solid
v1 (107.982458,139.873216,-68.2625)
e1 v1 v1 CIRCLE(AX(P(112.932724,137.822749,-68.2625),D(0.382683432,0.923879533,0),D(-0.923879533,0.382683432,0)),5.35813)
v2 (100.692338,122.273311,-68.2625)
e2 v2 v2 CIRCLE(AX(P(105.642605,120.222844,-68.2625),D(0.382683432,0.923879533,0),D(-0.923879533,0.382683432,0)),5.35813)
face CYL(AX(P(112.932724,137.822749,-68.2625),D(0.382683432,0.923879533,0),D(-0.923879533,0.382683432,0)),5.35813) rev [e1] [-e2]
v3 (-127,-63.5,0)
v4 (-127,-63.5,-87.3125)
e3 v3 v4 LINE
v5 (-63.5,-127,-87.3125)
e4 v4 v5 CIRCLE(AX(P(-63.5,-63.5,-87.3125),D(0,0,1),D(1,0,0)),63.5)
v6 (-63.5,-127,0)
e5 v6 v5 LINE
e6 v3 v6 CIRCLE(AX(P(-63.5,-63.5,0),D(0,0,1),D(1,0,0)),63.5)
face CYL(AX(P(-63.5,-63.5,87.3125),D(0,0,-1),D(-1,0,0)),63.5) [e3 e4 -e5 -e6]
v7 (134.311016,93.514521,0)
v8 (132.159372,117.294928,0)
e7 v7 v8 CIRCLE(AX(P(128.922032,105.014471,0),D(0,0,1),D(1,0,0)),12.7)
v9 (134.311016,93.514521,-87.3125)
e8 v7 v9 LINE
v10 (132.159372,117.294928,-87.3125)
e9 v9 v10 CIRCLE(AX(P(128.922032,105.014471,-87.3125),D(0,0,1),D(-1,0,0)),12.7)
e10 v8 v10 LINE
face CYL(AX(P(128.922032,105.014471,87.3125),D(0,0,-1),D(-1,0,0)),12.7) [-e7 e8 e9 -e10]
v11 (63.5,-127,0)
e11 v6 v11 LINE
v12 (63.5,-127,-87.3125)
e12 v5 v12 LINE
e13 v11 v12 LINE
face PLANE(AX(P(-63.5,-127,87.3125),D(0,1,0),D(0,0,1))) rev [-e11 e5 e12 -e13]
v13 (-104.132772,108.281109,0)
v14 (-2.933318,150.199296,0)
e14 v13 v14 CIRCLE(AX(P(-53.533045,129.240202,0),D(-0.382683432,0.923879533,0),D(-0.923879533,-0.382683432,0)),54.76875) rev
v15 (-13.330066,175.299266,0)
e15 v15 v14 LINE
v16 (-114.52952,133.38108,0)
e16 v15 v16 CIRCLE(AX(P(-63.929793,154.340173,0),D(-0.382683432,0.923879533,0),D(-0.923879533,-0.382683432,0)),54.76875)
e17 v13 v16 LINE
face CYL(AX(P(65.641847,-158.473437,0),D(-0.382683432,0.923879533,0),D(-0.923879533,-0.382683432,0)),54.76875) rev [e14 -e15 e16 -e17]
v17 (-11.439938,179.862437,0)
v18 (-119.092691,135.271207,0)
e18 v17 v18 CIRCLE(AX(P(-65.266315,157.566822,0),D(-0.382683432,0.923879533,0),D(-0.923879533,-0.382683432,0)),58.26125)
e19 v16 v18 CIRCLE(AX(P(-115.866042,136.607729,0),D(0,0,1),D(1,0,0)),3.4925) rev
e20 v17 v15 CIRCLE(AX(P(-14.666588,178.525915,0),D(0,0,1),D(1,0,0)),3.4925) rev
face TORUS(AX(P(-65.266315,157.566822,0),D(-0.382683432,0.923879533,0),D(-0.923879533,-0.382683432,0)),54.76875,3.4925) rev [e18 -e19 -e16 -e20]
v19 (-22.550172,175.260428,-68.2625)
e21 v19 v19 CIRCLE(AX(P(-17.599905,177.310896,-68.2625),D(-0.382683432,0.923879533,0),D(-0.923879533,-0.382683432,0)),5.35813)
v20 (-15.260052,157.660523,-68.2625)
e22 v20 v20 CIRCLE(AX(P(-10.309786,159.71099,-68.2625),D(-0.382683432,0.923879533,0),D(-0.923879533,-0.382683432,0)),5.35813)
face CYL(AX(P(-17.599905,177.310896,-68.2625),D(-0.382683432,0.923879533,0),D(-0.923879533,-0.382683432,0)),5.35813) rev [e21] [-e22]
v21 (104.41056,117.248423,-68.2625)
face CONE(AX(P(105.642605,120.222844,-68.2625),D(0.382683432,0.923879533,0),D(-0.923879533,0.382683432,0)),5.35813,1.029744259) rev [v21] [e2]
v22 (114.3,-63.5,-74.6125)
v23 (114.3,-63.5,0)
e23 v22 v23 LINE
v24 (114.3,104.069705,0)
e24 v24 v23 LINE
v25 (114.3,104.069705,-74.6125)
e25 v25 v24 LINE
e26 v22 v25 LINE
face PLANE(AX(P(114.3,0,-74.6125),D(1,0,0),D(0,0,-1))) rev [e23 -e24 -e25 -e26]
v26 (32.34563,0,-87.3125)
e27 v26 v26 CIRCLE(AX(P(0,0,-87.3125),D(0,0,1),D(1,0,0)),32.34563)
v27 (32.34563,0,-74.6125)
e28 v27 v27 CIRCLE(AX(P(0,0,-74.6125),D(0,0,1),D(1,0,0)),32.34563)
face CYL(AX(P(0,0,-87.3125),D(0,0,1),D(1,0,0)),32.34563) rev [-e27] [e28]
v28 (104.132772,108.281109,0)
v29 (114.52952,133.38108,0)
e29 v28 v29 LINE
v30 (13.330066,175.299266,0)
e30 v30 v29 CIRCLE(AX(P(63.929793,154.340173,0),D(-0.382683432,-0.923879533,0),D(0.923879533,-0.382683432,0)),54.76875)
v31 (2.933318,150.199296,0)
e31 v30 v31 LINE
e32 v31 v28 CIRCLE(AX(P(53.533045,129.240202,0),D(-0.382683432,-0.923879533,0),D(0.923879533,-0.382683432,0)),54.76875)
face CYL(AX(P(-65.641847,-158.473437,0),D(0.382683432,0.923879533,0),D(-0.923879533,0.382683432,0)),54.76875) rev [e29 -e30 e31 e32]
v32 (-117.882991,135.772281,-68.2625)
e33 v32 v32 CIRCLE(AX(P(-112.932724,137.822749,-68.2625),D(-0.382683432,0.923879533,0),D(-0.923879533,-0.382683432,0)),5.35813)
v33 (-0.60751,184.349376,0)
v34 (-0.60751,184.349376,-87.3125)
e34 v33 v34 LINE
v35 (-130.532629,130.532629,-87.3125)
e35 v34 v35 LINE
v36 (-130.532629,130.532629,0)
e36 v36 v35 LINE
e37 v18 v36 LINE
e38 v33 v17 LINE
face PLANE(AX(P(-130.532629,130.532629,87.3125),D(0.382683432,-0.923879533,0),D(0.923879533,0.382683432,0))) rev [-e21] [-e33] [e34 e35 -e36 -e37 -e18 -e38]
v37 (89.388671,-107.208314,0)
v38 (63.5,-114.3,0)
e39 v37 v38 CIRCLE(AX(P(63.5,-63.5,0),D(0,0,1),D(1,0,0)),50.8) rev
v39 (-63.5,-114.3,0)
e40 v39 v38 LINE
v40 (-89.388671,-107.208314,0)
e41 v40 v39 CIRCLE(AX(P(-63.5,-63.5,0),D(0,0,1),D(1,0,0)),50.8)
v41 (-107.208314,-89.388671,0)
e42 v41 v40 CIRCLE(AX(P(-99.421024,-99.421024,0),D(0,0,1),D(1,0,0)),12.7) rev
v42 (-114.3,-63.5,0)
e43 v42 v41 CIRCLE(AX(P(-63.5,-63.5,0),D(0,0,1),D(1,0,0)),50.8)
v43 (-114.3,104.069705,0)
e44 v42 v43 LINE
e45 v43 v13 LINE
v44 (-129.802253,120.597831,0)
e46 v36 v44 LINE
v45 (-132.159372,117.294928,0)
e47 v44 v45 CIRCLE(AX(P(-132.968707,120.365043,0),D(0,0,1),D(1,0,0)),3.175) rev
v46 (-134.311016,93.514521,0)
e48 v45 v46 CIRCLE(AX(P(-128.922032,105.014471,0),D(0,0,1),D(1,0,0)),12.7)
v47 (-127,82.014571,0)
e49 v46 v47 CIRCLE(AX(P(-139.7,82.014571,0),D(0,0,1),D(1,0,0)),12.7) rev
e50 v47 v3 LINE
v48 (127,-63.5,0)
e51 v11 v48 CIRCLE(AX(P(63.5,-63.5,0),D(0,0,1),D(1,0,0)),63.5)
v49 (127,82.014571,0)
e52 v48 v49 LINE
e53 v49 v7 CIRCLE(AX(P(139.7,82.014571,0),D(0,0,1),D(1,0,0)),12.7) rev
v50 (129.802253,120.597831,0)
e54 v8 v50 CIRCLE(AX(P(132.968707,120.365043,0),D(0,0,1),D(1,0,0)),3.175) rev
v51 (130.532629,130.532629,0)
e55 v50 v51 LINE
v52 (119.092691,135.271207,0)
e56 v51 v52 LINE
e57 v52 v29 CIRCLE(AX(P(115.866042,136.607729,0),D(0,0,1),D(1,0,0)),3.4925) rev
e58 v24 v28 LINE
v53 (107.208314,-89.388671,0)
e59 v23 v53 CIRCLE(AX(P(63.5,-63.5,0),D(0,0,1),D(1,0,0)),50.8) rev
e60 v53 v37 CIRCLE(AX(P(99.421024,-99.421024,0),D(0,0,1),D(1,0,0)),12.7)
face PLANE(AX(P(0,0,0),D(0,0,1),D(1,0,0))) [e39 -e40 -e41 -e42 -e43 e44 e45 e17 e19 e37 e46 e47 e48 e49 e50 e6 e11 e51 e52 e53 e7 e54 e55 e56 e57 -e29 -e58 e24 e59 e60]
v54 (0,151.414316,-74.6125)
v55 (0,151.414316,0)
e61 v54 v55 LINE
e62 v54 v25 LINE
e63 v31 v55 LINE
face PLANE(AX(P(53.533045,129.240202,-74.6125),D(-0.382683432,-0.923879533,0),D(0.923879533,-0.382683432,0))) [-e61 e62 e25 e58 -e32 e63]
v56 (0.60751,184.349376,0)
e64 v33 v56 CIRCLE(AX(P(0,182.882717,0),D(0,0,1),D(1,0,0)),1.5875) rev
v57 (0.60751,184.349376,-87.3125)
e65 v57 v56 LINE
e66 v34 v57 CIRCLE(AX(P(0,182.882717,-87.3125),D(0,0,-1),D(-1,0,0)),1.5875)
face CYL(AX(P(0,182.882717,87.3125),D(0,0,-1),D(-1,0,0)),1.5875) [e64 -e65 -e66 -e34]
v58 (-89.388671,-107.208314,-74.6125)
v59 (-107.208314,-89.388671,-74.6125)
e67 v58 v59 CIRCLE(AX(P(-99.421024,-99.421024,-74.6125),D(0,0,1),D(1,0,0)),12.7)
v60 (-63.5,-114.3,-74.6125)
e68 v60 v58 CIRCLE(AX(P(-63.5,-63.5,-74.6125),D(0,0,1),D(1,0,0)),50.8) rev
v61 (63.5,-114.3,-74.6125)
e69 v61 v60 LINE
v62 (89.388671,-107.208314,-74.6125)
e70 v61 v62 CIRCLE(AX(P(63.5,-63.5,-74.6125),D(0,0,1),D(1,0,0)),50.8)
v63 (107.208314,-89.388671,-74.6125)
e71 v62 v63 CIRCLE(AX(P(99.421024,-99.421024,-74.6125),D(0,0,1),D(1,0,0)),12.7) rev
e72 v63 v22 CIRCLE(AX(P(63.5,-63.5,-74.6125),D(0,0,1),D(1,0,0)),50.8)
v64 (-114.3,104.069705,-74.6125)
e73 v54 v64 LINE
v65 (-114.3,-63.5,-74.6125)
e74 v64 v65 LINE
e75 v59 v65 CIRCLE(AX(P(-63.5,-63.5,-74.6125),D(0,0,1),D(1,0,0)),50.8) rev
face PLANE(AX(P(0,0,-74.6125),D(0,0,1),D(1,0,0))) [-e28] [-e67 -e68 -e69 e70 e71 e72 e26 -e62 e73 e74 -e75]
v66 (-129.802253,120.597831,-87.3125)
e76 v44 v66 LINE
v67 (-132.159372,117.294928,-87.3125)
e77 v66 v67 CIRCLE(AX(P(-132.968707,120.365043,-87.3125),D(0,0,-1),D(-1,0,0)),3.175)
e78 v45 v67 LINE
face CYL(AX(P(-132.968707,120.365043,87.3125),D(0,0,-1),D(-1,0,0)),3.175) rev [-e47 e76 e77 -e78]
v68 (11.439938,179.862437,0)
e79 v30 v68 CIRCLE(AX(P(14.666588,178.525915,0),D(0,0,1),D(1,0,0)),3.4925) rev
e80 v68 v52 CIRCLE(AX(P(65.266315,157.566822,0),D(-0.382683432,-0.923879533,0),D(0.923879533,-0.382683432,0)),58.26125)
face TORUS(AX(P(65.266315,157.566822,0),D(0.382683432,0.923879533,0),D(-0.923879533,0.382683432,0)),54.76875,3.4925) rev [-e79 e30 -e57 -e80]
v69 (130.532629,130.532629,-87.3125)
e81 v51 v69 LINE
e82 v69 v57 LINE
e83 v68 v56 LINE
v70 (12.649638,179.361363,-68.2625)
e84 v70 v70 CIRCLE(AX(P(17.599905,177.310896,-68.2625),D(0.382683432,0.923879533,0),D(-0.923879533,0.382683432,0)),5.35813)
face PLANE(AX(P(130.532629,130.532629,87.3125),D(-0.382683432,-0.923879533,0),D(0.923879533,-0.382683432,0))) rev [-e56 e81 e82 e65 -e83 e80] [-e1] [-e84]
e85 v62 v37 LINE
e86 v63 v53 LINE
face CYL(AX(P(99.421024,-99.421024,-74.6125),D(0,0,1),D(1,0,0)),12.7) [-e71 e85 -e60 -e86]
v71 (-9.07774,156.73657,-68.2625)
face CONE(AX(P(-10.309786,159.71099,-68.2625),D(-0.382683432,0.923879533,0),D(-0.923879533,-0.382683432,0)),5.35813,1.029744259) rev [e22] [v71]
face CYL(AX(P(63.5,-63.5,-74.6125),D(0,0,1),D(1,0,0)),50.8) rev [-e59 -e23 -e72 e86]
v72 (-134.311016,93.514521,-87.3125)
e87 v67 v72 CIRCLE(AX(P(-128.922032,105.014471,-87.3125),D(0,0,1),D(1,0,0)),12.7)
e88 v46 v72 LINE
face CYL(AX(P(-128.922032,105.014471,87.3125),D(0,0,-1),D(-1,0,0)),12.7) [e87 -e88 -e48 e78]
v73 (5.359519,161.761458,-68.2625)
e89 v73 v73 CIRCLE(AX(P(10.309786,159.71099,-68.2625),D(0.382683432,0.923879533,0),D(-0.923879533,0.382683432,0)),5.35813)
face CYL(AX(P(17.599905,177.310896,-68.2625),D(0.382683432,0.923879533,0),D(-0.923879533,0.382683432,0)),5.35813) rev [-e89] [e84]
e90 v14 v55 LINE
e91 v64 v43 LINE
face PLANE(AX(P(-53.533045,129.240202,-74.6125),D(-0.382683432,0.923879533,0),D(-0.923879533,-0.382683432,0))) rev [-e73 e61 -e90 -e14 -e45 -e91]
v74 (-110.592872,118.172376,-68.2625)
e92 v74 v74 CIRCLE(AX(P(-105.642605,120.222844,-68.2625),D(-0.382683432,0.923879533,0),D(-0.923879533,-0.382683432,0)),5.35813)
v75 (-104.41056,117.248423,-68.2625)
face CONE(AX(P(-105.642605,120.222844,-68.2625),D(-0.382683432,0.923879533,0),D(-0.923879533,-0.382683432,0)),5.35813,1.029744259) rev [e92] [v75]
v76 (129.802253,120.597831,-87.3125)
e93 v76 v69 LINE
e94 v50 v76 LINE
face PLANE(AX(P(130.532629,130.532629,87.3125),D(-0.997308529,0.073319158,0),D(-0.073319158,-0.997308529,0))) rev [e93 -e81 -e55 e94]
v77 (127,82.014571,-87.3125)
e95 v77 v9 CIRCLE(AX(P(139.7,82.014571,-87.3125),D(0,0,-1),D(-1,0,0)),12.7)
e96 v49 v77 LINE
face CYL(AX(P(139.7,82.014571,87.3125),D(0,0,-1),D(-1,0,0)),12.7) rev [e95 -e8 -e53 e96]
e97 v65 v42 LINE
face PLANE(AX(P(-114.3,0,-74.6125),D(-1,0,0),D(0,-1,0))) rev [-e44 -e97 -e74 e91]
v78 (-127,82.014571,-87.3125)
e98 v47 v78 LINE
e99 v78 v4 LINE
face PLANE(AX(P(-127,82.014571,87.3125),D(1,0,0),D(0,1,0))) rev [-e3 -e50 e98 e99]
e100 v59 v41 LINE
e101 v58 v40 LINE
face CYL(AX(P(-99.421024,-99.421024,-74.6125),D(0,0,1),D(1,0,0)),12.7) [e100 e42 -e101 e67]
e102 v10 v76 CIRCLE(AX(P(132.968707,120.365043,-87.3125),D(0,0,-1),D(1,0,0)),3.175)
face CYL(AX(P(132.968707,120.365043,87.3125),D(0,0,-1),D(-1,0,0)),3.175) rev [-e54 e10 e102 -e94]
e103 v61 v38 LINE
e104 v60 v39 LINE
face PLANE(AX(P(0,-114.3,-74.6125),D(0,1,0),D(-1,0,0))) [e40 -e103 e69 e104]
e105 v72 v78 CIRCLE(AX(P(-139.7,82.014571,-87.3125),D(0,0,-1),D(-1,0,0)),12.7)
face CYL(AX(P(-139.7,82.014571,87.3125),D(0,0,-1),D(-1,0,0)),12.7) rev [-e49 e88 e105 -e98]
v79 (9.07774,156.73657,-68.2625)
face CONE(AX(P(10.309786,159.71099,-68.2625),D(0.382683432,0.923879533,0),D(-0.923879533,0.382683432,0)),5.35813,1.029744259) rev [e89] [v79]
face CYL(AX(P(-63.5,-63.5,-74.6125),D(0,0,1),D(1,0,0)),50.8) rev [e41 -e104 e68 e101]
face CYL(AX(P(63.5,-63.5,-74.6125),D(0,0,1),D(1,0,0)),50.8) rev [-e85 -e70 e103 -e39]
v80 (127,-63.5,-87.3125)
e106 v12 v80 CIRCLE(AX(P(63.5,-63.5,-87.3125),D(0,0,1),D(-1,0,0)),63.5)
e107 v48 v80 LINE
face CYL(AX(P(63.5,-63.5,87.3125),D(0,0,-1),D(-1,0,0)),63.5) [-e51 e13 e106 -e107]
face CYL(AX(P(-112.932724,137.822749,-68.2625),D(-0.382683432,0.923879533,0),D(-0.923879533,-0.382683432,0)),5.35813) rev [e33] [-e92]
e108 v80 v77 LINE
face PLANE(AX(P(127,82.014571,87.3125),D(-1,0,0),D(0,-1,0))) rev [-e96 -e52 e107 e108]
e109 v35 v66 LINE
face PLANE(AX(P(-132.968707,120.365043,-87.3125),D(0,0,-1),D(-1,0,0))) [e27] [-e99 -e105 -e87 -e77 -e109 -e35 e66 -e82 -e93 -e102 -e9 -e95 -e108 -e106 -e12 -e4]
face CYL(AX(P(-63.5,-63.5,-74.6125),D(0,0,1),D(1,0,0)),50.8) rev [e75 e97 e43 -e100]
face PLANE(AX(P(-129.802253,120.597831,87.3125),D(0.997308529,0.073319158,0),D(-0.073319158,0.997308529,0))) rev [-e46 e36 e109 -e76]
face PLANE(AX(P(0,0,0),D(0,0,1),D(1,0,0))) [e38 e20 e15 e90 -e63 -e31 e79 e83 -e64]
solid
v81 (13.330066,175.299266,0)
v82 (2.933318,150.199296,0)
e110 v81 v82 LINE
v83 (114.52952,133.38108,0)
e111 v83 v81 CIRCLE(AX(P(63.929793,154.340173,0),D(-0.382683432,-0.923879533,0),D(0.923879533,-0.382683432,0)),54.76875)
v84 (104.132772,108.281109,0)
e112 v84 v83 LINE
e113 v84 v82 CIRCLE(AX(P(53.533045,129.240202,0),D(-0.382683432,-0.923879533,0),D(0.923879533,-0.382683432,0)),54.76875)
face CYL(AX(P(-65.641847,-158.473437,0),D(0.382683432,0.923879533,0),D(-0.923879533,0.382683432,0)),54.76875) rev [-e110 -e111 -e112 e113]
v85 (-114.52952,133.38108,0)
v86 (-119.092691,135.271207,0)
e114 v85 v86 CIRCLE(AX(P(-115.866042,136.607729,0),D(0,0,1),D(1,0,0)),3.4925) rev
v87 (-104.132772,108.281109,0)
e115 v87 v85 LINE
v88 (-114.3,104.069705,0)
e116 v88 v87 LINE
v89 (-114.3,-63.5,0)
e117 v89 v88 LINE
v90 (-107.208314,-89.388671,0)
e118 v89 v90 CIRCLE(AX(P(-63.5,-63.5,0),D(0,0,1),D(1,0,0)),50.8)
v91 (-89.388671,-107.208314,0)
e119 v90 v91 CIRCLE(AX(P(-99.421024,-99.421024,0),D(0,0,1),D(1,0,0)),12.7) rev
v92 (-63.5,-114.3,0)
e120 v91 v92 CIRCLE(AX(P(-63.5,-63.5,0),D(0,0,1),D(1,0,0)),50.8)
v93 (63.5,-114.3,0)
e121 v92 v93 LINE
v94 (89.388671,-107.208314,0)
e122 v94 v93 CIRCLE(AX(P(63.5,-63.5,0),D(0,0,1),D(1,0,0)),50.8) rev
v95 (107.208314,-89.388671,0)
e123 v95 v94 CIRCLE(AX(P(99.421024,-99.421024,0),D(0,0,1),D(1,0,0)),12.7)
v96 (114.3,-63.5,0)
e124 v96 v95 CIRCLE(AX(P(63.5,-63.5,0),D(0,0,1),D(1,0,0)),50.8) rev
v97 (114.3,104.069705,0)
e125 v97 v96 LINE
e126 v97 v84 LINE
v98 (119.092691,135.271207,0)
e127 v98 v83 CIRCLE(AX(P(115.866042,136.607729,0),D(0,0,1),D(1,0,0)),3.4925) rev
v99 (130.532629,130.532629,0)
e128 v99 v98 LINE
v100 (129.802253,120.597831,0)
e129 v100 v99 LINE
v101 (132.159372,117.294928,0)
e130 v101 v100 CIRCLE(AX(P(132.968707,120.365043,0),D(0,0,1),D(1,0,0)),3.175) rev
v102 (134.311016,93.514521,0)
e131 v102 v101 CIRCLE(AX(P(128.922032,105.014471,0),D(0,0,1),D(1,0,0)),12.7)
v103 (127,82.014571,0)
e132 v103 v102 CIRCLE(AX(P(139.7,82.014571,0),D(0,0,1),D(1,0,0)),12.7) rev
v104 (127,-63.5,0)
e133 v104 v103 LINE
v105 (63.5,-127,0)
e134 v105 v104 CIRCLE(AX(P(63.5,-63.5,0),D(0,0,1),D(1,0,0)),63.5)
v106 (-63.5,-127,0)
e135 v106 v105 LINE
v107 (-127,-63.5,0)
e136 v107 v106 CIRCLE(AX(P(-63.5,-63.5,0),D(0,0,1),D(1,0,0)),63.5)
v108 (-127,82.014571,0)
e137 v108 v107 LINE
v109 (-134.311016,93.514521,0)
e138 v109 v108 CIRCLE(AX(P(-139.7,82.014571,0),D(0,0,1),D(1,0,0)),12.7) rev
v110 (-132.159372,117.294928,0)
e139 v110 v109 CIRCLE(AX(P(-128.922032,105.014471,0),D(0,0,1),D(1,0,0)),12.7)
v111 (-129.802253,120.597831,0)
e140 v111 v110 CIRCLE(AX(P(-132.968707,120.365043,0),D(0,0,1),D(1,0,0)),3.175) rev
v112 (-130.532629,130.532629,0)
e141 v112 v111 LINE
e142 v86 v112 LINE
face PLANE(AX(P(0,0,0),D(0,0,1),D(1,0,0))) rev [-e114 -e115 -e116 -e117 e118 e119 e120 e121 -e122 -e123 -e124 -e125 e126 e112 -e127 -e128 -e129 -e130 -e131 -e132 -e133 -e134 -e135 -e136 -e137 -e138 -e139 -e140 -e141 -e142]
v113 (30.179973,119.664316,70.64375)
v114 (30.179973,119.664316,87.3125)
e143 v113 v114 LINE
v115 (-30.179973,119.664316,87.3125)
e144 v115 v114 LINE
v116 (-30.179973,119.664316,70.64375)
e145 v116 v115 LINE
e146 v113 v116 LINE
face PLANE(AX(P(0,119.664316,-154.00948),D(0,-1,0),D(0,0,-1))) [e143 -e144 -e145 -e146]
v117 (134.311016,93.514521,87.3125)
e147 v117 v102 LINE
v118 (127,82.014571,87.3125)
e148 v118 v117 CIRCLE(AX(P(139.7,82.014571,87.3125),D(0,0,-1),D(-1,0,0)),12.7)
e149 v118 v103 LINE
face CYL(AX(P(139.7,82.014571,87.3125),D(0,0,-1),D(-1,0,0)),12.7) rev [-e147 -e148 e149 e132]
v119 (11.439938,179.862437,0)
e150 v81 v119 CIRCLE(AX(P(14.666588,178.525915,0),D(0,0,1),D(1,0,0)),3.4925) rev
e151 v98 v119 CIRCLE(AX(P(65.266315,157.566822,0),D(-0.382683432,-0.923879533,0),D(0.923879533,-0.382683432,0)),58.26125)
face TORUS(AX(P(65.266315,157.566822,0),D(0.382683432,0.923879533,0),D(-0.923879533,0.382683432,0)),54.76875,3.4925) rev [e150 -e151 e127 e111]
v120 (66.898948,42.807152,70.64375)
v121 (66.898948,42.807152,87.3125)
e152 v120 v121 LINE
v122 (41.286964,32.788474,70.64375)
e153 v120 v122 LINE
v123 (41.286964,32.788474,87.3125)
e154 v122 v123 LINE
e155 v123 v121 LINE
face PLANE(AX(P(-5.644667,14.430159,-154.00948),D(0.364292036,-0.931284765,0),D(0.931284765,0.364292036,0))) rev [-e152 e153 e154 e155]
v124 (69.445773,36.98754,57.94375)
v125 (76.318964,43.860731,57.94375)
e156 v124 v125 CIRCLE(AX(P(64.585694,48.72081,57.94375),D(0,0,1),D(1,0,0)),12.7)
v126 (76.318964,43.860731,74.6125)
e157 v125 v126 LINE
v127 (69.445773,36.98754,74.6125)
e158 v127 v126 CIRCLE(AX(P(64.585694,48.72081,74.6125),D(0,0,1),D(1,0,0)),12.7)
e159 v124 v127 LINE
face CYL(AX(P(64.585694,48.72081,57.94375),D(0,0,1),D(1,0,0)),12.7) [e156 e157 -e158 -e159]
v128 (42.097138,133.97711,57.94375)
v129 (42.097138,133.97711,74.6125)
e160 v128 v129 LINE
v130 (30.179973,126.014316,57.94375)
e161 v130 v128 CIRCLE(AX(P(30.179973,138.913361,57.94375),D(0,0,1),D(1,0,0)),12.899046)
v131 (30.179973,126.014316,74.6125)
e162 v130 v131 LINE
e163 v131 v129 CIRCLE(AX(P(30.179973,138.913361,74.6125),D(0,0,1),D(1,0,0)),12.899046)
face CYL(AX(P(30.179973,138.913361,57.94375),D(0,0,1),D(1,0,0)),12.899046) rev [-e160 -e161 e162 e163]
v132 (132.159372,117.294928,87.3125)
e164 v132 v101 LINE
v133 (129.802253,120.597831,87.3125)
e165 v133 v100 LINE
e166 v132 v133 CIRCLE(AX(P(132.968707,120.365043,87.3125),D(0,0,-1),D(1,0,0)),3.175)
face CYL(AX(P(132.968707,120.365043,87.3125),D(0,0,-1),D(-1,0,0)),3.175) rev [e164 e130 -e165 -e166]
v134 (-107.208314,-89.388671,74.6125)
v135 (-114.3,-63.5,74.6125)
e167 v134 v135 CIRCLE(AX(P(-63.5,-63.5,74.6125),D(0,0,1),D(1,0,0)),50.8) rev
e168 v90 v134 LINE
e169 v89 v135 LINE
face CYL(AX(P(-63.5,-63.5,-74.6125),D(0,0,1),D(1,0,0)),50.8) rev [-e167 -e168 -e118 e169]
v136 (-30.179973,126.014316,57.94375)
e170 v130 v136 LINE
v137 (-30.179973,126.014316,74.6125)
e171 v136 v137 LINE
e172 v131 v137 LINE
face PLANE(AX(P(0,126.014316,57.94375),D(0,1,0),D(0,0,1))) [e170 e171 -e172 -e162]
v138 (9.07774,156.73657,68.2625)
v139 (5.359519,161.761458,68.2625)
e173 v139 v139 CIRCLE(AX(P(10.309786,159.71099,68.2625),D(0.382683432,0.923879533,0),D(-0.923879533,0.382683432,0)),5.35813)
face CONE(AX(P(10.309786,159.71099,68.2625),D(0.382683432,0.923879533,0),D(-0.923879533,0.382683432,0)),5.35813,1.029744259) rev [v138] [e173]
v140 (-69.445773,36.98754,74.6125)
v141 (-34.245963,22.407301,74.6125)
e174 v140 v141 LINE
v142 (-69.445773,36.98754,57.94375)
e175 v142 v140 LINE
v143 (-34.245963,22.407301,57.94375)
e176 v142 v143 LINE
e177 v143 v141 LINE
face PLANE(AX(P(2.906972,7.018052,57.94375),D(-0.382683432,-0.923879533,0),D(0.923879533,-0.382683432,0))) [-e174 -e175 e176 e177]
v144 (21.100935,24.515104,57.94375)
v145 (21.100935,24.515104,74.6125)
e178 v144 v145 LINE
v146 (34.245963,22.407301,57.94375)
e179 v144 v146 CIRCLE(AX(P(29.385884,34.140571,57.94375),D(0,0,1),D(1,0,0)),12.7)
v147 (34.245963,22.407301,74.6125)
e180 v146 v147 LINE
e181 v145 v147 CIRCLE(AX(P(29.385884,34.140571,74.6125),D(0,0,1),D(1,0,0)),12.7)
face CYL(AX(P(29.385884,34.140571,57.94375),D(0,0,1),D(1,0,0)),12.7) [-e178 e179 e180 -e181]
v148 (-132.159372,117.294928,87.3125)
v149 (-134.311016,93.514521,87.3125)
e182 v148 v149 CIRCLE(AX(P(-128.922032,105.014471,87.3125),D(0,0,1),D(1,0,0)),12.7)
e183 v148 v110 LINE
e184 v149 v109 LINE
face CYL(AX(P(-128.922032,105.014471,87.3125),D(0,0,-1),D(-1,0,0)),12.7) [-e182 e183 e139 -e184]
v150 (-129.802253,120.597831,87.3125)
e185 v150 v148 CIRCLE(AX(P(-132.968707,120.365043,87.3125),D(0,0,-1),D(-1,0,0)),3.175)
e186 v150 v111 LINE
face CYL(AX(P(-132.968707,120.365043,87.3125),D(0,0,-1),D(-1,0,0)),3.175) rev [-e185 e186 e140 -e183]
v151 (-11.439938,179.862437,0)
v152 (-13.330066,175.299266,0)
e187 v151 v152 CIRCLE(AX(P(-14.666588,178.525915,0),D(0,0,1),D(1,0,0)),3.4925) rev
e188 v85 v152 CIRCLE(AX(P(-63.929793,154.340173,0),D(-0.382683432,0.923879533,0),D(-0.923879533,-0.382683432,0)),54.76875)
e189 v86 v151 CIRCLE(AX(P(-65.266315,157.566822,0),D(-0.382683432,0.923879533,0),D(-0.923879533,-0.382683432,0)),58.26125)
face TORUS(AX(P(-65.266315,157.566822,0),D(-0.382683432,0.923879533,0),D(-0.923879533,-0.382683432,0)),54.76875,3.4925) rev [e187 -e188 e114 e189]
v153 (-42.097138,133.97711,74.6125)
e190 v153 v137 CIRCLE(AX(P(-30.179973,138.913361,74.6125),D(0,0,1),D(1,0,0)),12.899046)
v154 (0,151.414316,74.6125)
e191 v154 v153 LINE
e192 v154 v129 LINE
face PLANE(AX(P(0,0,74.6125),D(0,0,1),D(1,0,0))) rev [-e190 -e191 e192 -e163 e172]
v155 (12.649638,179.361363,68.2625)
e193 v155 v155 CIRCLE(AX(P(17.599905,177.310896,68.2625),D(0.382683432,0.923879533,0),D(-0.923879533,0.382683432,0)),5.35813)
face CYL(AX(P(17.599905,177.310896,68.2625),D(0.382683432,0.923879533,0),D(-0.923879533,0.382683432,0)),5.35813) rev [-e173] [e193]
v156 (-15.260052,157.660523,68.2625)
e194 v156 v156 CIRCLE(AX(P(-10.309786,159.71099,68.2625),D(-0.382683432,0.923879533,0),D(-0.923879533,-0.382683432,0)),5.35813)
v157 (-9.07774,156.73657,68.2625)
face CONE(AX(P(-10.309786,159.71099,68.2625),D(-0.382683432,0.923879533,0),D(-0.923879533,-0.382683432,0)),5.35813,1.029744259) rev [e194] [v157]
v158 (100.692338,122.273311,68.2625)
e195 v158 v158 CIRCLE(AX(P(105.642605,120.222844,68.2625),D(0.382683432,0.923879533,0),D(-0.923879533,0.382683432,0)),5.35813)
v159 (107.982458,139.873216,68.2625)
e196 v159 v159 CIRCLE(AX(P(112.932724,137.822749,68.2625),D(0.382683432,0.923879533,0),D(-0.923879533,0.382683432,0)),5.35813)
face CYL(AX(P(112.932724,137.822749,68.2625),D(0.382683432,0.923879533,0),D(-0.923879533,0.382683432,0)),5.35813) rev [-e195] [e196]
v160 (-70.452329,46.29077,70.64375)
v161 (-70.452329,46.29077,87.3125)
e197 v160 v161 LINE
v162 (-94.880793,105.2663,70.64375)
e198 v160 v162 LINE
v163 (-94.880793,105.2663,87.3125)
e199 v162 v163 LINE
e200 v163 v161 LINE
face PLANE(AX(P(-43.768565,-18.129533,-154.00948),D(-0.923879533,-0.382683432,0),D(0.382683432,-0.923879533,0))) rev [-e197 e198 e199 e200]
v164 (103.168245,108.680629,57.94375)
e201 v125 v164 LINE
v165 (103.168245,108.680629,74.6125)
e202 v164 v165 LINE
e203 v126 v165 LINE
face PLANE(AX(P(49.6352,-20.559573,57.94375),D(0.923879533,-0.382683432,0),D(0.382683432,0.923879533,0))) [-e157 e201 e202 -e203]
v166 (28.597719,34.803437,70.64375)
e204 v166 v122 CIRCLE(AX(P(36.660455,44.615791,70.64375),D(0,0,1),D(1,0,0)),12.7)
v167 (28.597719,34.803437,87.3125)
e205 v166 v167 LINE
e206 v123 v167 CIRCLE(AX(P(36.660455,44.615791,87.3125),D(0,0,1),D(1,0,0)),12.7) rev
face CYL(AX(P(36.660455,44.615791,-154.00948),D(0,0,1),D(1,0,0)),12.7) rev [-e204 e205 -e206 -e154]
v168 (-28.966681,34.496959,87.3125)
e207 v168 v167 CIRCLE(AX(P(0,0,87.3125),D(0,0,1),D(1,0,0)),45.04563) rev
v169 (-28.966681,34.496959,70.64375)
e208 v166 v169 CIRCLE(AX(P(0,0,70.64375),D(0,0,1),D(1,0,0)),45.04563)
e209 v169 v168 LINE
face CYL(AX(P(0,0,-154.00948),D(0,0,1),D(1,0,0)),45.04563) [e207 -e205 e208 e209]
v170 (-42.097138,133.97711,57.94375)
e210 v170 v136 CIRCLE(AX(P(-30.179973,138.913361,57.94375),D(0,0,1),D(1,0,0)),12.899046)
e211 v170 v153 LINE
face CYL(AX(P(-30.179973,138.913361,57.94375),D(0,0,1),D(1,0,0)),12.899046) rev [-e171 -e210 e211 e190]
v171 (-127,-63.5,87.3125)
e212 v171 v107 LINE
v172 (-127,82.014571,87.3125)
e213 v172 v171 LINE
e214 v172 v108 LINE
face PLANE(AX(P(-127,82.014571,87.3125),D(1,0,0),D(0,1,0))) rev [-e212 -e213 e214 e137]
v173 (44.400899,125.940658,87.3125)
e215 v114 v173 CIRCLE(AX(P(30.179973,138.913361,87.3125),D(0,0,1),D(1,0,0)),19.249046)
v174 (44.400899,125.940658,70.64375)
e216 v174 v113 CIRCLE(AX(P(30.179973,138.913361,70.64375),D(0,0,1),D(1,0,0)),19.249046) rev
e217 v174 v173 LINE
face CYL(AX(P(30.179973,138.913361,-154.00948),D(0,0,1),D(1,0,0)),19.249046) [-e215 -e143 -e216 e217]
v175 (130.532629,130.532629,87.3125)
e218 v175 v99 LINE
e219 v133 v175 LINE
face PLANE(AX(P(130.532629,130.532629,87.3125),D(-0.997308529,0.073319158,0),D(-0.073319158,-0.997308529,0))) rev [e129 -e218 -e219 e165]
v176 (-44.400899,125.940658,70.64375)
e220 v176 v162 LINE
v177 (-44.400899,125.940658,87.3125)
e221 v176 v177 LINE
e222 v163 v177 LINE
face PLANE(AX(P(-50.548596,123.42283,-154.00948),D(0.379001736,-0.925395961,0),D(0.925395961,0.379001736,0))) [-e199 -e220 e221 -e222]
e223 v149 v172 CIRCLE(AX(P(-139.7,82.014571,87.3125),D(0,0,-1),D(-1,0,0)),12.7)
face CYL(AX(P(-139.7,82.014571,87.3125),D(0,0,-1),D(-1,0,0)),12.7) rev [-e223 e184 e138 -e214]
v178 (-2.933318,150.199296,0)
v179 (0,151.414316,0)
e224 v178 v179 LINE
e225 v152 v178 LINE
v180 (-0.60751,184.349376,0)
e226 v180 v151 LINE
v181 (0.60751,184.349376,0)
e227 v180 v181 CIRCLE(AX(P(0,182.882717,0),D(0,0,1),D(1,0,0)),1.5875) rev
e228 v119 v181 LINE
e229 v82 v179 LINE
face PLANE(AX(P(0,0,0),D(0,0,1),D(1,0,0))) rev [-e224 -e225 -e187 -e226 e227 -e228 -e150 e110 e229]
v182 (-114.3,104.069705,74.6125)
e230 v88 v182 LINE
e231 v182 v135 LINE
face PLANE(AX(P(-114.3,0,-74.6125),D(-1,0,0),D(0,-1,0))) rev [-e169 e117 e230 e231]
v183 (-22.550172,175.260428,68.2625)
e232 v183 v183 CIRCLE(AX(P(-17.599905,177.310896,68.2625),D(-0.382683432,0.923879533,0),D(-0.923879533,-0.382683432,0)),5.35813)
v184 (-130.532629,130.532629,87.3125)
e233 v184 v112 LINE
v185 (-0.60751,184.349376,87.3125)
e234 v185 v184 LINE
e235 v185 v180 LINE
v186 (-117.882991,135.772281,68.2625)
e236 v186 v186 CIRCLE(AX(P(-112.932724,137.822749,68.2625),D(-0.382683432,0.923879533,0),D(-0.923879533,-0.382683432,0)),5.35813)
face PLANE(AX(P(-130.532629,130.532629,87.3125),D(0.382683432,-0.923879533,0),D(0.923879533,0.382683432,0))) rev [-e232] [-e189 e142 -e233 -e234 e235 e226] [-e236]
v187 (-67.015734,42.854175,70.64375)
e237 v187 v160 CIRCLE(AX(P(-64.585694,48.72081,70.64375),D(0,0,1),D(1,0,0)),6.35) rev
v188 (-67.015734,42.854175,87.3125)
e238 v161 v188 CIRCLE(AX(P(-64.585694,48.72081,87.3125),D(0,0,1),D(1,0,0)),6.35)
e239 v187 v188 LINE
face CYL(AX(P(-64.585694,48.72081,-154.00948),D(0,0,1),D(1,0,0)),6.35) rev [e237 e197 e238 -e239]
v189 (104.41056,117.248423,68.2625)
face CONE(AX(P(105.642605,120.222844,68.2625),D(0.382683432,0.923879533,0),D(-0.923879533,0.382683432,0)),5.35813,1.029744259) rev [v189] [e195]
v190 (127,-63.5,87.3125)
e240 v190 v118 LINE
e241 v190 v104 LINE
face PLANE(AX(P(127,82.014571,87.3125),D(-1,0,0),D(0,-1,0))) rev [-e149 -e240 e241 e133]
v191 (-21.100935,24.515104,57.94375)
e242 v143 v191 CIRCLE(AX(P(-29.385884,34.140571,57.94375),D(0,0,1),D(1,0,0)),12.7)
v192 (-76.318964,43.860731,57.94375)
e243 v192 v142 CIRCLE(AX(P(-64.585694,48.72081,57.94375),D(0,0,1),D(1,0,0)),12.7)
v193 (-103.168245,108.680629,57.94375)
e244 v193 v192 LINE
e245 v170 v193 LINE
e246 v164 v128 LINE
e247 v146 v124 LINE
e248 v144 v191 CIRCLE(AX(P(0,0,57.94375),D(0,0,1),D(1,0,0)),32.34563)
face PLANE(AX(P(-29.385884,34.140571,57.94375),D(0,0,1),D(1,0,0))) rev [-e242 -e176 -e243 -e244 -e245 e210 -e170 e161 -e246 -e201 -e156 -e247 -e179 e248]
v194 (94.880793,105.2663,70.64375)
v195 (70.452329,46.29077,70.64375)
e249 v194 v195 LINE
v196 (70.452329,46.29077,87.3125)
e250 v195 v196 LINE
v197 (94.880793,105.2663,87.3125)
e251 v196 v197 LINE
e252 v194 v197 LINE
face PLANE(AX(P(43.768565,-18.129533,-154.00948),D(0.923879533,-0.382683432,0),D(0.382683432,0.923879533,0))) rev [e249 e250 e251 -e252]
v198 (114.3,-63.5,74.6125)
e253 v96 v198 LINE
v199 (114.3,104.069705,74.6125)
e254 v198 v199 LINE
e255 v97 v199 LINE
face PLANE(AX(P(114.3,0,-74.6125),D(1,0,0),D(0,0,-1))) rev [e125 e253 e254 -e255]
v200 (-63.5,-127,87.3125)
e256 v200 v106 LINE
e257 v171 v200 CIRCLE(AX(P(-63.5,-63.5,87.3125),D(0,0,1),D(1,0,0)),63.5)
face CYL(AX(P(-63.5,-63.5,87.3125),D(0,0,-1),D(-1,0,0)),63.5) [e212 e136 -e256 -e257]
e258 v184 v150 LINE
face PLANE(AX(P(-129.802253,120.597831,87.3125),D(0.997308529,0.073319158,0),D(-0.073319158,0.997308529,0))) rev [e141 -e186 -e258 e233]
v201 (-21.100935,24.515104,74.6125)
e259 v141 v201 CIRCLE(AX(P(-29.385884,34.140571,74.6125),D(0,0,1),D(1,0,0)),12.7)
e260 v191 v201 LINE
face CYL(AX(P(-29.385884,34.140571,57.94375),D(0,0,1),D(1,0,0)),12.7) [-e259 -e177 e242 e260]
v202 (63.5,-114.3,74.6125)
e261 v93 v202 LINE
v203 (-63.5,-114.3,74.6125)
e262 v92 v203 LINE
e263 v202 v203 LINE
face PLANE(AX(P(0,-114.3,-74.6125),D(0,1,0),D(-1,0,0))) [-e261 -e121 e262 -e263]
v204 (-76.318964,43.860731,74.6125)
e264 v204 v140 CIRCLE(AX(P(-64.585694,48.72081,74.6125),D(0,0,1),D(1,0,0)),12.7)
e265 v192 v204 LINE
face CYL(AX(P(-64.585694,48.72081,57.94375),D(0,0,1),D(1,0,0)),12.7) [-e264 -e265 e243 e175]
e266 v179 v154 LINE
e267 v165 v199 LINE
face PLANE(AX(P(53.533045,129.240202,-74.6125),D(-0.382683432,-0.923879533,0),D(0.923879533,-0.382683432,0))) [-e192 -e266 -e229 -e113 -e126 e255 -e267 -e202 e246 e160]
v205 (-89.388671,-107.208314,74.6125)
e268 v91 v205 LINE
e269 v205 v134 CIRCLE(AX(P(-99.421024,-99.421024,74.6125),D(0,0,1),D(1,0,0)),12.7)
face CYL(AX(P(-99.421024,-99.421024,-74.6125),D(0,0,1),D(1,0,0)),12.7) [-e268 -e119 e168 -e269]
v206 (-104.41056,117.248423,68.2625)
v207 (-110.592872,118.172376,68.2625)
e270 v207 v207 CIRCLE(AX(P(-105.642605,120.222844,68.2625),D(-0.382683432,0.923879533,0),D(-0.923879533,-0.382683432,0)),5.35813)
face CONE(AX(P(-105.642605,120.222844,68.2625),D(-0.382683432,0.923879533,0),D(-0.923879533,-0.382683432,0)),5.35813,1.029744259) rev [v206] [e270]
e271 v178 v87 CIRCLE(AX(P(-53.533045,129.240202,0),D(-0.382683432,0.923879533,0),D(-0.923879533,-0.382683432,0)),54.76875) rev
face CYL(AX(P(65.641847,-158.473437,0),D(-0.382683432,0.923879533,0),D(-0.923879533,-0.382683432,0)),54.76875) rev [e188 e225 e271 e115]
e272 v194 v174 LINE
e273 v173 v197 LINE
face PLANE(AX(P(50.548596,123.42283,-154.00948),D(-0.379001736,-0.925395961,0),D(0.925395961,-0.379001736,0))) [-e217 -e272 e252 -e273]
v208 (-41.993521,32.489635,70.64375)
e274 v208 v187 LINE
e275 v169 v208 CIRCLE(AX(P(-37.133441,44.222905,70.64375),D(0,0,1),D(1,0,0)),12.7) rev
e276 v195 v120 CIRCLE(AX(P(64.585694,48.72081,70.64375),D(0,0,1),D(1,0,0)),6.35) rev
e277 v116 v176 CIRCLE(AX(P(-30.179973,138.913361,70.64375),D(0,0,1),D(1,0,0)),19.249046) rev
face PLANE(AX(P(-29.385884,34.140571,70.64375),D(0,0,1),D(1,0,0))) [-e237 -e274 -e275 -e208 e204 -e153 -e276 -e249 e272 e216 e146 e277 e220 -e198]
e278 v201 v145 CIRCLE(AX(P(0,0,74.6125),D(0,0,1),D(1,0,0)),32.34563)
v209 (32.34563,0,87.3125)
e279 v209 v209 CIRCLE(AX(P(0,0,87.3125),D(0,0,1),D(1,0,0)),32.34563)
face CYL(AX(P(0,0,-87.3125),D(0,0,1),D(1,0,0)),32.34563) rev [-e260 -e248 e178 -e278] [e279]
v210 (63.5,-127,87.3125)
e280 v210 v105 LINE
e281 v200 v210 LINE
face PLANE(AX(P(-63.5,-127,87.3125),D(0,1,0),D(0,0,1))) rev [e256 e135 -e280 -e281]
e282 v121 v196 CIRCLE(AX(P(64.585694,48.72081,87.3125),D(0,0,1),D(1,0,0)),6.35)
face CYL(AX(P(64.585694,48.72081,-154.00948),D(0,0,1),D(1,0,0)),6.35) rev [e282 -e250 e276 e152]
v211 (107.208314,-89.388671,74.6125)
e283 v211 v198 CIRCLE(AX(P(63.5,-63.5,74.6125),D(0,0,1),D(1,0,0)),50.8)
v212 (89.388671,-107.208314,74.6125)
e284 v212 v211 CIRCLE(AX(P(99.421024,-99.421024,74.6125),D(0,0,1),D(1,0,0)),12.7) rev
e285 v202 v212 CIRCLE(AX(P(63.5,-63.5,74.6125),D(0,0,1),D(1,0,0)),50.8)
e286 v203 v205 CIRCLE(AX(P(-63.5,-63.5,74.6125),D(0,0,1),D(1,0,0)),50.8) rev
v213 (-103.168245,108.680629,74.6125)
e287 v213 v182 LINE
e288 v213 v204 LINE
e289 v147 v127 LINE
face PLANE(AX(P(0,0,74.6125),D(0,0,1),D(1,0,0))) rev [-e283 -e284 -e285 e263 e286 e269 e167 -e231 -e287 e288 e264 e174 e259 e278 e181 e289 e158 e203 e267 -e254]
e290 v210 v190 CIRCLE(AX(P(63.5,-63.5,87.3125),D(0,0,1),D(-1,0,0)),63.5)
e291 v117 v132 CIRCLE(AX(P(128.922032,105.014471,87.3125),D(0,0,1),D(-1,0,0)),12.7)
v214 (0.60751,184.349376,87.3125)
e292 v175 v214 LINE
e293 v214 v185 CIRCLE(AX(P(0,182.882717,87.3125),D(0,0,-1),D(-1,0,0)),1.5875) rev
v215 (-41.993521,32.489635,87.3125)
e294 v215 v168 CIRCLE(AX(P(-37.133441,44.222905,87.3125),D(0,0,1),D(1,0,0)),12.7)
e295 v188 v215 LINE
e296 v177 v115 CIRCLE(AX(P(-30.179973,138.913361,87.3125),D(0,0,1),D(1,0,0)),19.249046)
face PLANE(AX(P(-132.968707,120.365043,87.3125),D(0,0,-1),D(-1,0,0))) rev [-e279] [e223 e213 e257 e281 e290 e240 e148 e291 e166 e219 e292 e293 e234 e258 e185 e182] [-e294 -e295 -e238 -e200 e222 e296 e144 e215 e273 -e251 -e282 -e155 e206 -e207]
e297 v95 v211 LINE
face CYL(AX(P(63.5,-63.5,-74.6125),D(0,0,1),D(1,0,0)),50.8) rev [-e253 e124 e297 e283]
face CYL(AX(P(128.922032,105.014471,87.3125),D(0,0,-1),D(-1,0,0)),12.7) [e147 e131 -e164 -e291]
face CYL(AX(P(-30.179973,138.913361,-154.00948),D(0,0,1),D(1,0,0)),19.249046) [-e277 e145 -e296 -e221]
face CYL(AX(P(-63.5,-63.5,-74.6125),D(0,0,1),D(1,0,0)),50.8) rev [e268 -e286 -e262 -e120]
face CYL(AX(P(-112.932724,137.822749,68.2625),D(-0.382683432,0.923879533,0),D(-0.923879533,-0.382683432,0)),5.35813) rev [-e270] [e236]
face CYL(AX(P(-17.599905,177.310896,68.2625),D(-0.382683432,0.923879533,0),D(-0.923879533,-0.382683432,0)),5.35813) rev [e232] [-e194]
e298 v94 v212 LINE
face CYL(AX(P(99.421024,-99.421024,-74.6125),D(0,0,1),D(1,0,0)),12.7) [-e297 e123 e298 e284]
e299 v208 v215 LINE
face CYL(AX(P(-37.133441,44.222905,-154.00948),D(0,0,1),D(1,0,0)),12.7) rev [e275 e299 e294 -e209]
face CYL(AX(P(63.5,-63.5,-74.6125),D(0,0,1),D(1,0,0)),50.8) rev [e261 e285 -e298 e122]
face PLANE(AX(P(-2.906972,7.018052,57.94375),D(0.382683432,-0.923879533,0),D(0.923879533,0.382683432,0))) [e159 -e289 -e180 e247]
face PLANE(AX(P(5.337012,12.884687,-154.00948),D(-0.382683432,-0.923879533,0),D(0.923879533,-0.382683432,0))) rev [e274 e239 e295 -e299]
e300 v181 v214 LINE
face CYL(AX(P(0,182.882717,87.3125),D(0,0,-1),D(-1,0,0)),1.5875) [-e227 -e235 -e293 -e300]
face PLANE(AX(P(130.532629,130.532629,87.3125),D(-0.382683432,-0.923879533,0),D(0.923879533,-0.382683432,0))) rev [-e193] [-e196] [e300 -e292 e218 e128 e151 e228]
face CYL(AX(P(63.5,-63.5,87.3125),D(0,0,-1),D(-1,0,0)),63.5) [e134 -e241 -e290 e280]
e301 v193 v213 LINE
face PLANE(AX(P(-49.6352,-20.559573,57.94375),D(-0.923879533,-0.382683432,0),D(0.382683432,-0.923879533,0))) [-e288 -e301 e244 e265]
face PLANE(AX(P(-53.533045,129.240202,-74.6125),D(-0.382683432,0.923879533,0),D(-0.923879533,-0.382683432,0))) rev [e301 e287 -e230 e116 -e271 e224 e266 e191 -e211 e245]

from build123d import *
from build123d.topology import SkipClean

# Parameters (mm, degrees)
BOSS_EXTRUDE1_DEPTH                  = 87.3125
CUT_EXTRUDE1_DEPTH                   = 74.6125
CUT_EXTRUDE2_REACH                   = 364.498
SKETCH4_R                            = 54.76875
SKETCH5_R                            = 32.34563
CUT_EXTRUDE3_DEPTH                   = 291.909307414
BOSS_EXTRUDE2_START                  = -12.7
BOSS_EXTRUDE2_DEPTH                  = 16.66875
CUT_EXTRUDE5_DEPTH                   = 16.66875
TAP_DRILL_FOR_1_2_13_TAP2_AT_2_COUNT = 2
TAP_DRILL_FOR_1_2_13_TAP2_AT_2_PITCH = 103.1875
TAP_DRILL_FOR_1_2_13_TAP2_AT_3_COUNT = 2
TAP_DRILL_FOR_1_2_13_TAP2_AT_3_PITCH = 171.133678104
TAP_DRILL_FOR_1_2_13_TAP2_AT_4_COUNT = 2
TAP_DRILL_FOR_1_2_13_TAP2_AT_4_PITCH = 136.525
SKETCH12_R                           = 58.26125
SKETCH12_R_2                         = 54.76875
CUT_EXTRUDE6_DEPTH                   = 3.4925
FILLET3_R                            = 1.5875
FILLET4_R                            = 3.4925
FILLET4_OF_MIRROR2_R                 = 3.4925


with BuildPart() as part:
    # Sketch1 → Boss-Extrude1 (new, symmetric)
    with BuildSketch(Plane.XY):
        with BuildLine():
            Line((-63.5, -127), (63.5, -127))
            ThreePointArc((63.5, -127), (108.401280605, -108.401280605), (127, -63.5))
            Line((127, -63.5), (127, 82.014571468))
            ThreePointArc((127, 82.014571468), (128.982488633, 88.828157168), (134.311015762, 93.51452142))
            ThreePointArc((134.311015762, 93.51452142), (141.570363806, 106.158888477), (132.159372053, 117.29492846))
            ThreePointArc((132.159372053, 117.29492846), (130.384327695, 118.520697957), (129.802252607, 120.597831059))
            Line((129.802252607, 120.597831059), (130.53262945, 130.53262945))
            Line((130.53262945, 130.53262945), (0, 184.6010149))
            Line((0, 184.6010149), (-130.53262945, 130.53262945))
            Line((-130.53262945, 130.53262945), (-129.802252607, 120.597831059))
            ThreePointArc((-129.802252607, 120.597831059), (-130.384327695, 118.520697957), (-132.159372053, 117.29492846))
            ThreePointArc((-132.159372053, 117.29492846), (-141.570363806, 106.158888477), (-134.311015762, 93.51452142))
            ThreePointArc((-134.311015762, 93.51452142), (-128.982488633, 88.828157168), (-127, 82.014571468))
            Line((-127, 82.014571468), (-127, -63.5))
            ThreePointArc((-127, -63.5), (-108.401280605, -108.401280605), (-63.5, -127))
        make_face()
    extrude(amount=BOSS_EXTRUDE1_DEPTH, both=True)

    # Sketch3 → Cut-Extrude1 (cut, symmetric)
    with BuildSketch(Plane.XY):
        with BuildLine():
            Line((-63.5, -114.3), (63.5, -114.3))
            ThreePointArc((63.5, -114.3), (76.921207893, -112.495011773), (89.388670817, -107.208314121))
            ThreePointArc((89.388670817, -107.208314121), (90.440768363, -90.440768363), (107.208314121, -89.388670817))
            ThreePointArc((107.208314121, -89.388670817), (112.495011773, -76.921207893), (114.3, -63.5))
            Line((114.3, -63.5), (114.3, 104.069705413))
            Line((114.3, 104.069705413), (0, 151.414315592))
            Line((0, 151.414315592), (-114.3, 104.069705413))
            Line((-114.3, 104.069705413), (-114.3, -63.5))
            ThreePointArc((-114.3, -63.5), (-112.495011773, -76.921207893), (-107.208314121, -89.388670817))
            ThreePointArc((-107.208314121, -89.388670817), (-90.440768363, -90.440768363), (-89.388670817, -107.208314121))
            ThreePointArc((-89.388670817, -107.208314121), (-76.921207893, -112.495011773), (-63.5, -114.3))
        make_face()
    extrude(amount=CUT_EXTRUDE1_DEPTH, both=True, mode=Mode.SUBTRACT)

    # Sketch4 → Cut-Extrude2 (cut, up to next)
    with BuildSketch(Plane(origin=(-65.266314725, 157.566822175, 0), x_dir=(0.9238795325112863, 0.3826834323650909, 0), z_dir=(-0.3826834323650909, 0.9238795325112863, 0)), mode=Mode.PRIVATE) as cut_extrude2_sk1:
        with Locations(Location((0, 0, 0), (0, 0, 180))):
            Circle(SKETCH4_R)
    cut_extrude2_tool1 = extrude(cut_extrude2_sk1.sketch, amount=-CUT_EXTRUDE2_REACH, mode=Mode.PRIVATE) & part.part
    cut_extrude2 = cut_extrude2_tool1.solids().sort_by_distance((-65.266315, 157.566822, 0))[0]
    add(cut_extrude2, mode=Mode.SUBTRACT)

    # Sketch5 → Cut-Extrude3 (cut, through all)
    with BuildSketch(Plane.XY.offset(87.3125)):
        Circle(SKETCH5_R)
    extrude(amount=-CUT_EXTRUDE3_DEPTH, mode=Mode.SUBTRACT)

    # Sketch6 → Boss-Extrude2 (add)
    with SkipClean():  # the faces are left unmerged after this step: merging them gives an invalid solid
        with BuildSketch(Plane.XY.offset(87.3125).offset(BOSS_EXTRUDE2_START)):
            with BuildLine():
                Line((-103.168245091, 108.680629269), (-76.318963971, 43.86073065))
                ThreePointArc((-76.318963971, 43.86073065), (-73.565950029, 39.74055412), (-69.445773499, 36.987540178))
                Line((-69.445773499, 36.987540178), (-34.24596331, 22.407301405))
                ThreePointArc((-34.24596331, 22.407301405), (-27.375127797, 21.600760439), (-21.100935252, 24.515103744))
                ThreePointArc((-21.100935252, 24.515103744), (0, 32.34563), (21.100935252, 24.515103744))
                ThreePointArc((21.100935252, 24.515103744), (27.375127797, 21.600760439), (34.24596331, 22.407301405))
                Line((34.24596331, 22.407301405), (69.445773499, 36.987540178))
                ThreePointArc((69.445773499, 36.987540178), (73.565950029, 39.74055412), (76.318963971, 43.86073065))
                Line((76.318963971, 43.86073065), (103.168245091, 108.680629269))
                Line((103.168245091, 108.680629269), (42.097137505, 133.977110301))
                ThreePointArc((42.097137505, 133.977110301), (37.346298964, 128.18819679), (30.179973057, 126.014315592))
                Line((30.179973057, 126.014315592), (-30.179973057, 126.014315592))
                ThreePointArc((-30.179973057, 126.014315592), (-37.346298964, 128.18819679), (-42.097137505, 133.977110301))
                Line((-42.097137505, 133.977110301), (-103.168245091, 108.680629269))
            make_face()
        extrude(amount=-BOSS_EXTRUDE2_DEPTH)

    # Sketch7 → Cut-Extrude5 (cut)
    with SkipClean():  # the faces are left unmerged after this step: merging them gives an invalid solid
        with BuildSketch(Plane.XY.offset(87.3125)):
            with BuildLine():
                Line((41.286964233, 32.788474366), (66.898948335, 42.807151986))
                ThreePointArc((66.898948335, 42.807151986), (69.031090097, 44.186391566), (70.45232894, 46.290770445))
                Line((70.45232894, 46.290770445), (94.880793186, 105.266300136))
                Line((94.880793186, 105.266300136), (44.400899101, 125.940658233))
                ThreePointArc((44.400899101, 125.940658233), (37.952154451, 121.303166596), (30.179973057, 119.664315592))
                Line((30.179973057, 119.664315592), (-30.179973057, 119.664315592))
                ThreePointArc((-30.179973057, 119.664315592), (-37.952154451, 121.303166596), (-44.400899101, 125.940658233))
                Line((-44.400899101, 125.940658233), (-94.880793186, 105.266300136))
                Line((-94.880793186, 105.266300136), (-70.45232894, 46.290770445))
                ThreePointArc((-70.45232894, 46.290770445), (-69.075821969, 44.23068218), (-67.015733704, 42.854175209))
                Line((-67.015733704, 42.854175209), (-41.993520552, 32.489635161))
                ThreePointArc((-41.993520552, 32.489635161), (-35.199307828, 31.671047632), (-28.966680979, 34.496958926))
                ThreePointArc((-28.966680979, 34.496958926), (-0.239823776, 45.044991582), (28.597719146, 34.803437212))
                ThreePointArc((28.597719146, 34.803437212), (34.668739167, 32.072941657), (41.286964233, 32.788474366))
            make_face()
        extrude(amount=-CUT_EXTRUDE5_DEPTH, mode=Mode.SUBTRACT)

    # Sketch11 → Tap Drill for 1/2-13 Tap2 (revolve, cut)
    with SkipClean():  # the faces are left unmerged after this step: merging them gives an invalid solid
        with BuildSketch(Plane(origin=(-112.932724355, 137.822748836, -68.2625), x_dir=(-0.9238795325112863, -0.38268343236509084, 0), z_dir=(0, 0, 1))):
            Polygon((0, 0), (0, 22.269489309), (5.35813, 19.05), (5.35813, 0), align=None)
        tap_drill_for_1_2_13_tap2 = revolve(axis=Axis((-115.362764151, 143.689383868, -68.2625), (0.3826834323650909, -0.9238795325112864, 0)), mode=Mode.SUBTRACT)

    # Tap Drill for 1/2-13 Tap2 at 2: Tap Drill for 1/2-13 Tap2 ×2
    with SkipClean():  # the faces are left unmerged after this step: merging them gives an invalid solid
        with Locations(*[Vector(0.9238795325112863, 0.38268343236509084, 0) * (i * TAP_DRILL_FOR_1_2_13_TAP2_AT_2_PITCH) for i in range(1, TAP_DRILL_FOR_1_2_13_TAP2_AT_2_COUNT)]):
            add(tap_drill_for_1_2_13_tap2, mode=Mode.SUBTRACT)

    # Tap Drill for 1/2-13 Tap2 at 3: Tap Drill for 1/2-13 Tap2 ×2
    with SkipClean():  # the faces are left unmerged after this step: merging them gives an invalid solid
        with Locations(*[Vector(0.5570663841124427, 0.23074445144151456, 0.7977681629526483) * (i * TAP_DRILL_FOR_1_2_13_TAP2_AT_3_PITCH) for i in range(1, TAP_DRILL_FOR_1_2_13_TAP2_AT_3_COUNT)]):
            add(tap_drill_for_1_2_13_tap2, mode=Mode.SUBTRACT)

    # Tap Drill for 1/2-13 Tap2 at 4: Tap Drill for 1/2-13 Tap2 ×2
    with SkipClean():  # the faces are left unmerged after this step: merging them gives an invalid solid
        with Locations(*[(0, 0, i * TAP_DRILL_FOR_1_2_13_TAP2_AT_4_PITCH) for i in range(1, TAP_DRILL_FOR_1_2_13_TAP2_AT_4_COUNT)]):
            add(tap_drill_for_1_2_13_tap2, mode=Mode.SUBTRACT)

    # Sketch12 → Cut-Extrude6 (cut)
    with SkipClean():  # the faces are left unmerged after this step: merging them gives an invalid solid
        with BuildSketch(Plane(origin=(-65.266314725, 157.566822175, 0), x_dir=(0.9238795325112854, 0.38268343236509295, 0), z_dir=(-0.38268343236509295, 0.9238795325112854, 0))):
            with Locations(Location((0, 0, 0), (0, 0, 180))):
                Circle(SKETCH12_R)
            with Locations(Location((0, 0, 0), (0, 0, 180))):
                Circle(SKETCH12_R_2, mode=Mode.SUBTRACT)
        cut_extrude6 = extrude(amount=-CUT_EXTRUDE6_DEPTH, mode=Mode.SUBTRACT)

    # Fillet3
    fillet3_edges = [part.edges().sort_by_distance(p)[0] for p in [
        (0, 184.6010149, 0),
    ]]
    fillet(fillet3_edges, radius=FILLET3_R)

    # Fillet4
    fillet4_edges = [part.edges().sort_by_distance(p)[0] for p in [
        (-10.103416424, 176.635788031, 0),
    ]]
    fillet(fillet4_edges, radius=FILLET4_R - 0.0001)  # a hair under: the kernel refuses the full size

    # Mirror2: Cut-Extrude2, Tap Drill for 1/2-13 Tap2, Cut-Extrude6 across plane
    add(cut_extrude2.mirror(Plane(origin=(0, 0, 0), x_dir=(0, 0, 1), z_dir=(1, 0, 0))), mode=Mode.SUBTRACT)
    add(tap_drill_for_1_2_13_tap2.mirror(Plane(origin=(0, 0, 0), x_dir=(0, 0, 1), z_dir=(1, 0, 0))), mode=Mode.SUBTRACT)
    add(cut_extrude6.mirror(Plane(origin=(0, 0, 0), x_dir=(0, 0, 1), z_dir=(1, 0, 0))), mode=Mode.SUBTRACT)

    # Mirror2 copy 1 sketch → Mirror2 copy 1 (revolve, cut)
    with BuildSketch(Plane(origin=(17.599905094, 177.310895513, -68.2625), x_dir=(0.9238795325112863, -0.38268343236509084, 0), z_dir=(0, 0, 1))):
        Polygon((0, 0), (0, -22.269489309), (5.35813, -19.05), (5.35813, 0), align=None)
    revolve(axis=Axis((20.02994489, 183.177530545, -68.2625), (0.3826834323650909, 0.9238795325112864, 0)), mode=Mode.SUBTRACT)

    # Mirror2 copy 2 sketch → Mirror2 copy 2 (revolve, cut)
    with BuildSketch(Plane(origin=(17.599905094, 177.310895513, 68.2625), x_dir=(0.9238795325112863, -0.38268343236509084, 0), z_dir=(0, 0, 1))):
        Polygon((0, 0), (0, -22.269489309), (5.35813, -19.05), (5.35813, 0), align=None)
    revolve(axis=Axis((20.02994489, 183.177530545, 68.2625), (0.3826834323650909, 0.9238795325112864, 0)), mode=Mode.SUBTRACT)

    # Mirror2 copy 3 sketch → Mirror2 copy 3 (revolve, cut)
    with BuildSketch(Plane(origin=(112.932724355, 137.822748836, 68.2625), x_dir=(0.9238795325112863, -0.38268343236509084, 0), z_dir=(0, 0, 1))):
        Polygon((0, 0), (0, -22.269489309), (5.35813, -19.05), (5.35813, 0), align=None)
    revolve(axis=Axis((115.362764151, 143.689383868, 68.2625), (0.3826834323650909, 0.9238795325112864, 0)), mode=Mode.SUBTRACT)

    # Fillet4 of Mirror2
    fillet4_of_mirror2_edges = [part.edges().sort_by_distance(p)[0] for p in [
        (10.103416424, 176.635788031, 0),
    ]]
    fillet(fillet4_of_mirror2_edges, radius=FILLET4_OF_MIRROR2_R - 0.0001)  # a hair under: the kernel refuses the full size


with BuildPart() as body_2:
    # Split1: the piece on the far side of the plane
    add(part.part)
    split(bisect_by=Plane.XY, keep=Keep.BOTTOM)


with BuildPart() as part_1:
    add(part.part)

    # Split1
    split(bisect_by=Plane.XY, keep=Keep.TOP)


solid = Compound([body_2.part, part_1.part])
